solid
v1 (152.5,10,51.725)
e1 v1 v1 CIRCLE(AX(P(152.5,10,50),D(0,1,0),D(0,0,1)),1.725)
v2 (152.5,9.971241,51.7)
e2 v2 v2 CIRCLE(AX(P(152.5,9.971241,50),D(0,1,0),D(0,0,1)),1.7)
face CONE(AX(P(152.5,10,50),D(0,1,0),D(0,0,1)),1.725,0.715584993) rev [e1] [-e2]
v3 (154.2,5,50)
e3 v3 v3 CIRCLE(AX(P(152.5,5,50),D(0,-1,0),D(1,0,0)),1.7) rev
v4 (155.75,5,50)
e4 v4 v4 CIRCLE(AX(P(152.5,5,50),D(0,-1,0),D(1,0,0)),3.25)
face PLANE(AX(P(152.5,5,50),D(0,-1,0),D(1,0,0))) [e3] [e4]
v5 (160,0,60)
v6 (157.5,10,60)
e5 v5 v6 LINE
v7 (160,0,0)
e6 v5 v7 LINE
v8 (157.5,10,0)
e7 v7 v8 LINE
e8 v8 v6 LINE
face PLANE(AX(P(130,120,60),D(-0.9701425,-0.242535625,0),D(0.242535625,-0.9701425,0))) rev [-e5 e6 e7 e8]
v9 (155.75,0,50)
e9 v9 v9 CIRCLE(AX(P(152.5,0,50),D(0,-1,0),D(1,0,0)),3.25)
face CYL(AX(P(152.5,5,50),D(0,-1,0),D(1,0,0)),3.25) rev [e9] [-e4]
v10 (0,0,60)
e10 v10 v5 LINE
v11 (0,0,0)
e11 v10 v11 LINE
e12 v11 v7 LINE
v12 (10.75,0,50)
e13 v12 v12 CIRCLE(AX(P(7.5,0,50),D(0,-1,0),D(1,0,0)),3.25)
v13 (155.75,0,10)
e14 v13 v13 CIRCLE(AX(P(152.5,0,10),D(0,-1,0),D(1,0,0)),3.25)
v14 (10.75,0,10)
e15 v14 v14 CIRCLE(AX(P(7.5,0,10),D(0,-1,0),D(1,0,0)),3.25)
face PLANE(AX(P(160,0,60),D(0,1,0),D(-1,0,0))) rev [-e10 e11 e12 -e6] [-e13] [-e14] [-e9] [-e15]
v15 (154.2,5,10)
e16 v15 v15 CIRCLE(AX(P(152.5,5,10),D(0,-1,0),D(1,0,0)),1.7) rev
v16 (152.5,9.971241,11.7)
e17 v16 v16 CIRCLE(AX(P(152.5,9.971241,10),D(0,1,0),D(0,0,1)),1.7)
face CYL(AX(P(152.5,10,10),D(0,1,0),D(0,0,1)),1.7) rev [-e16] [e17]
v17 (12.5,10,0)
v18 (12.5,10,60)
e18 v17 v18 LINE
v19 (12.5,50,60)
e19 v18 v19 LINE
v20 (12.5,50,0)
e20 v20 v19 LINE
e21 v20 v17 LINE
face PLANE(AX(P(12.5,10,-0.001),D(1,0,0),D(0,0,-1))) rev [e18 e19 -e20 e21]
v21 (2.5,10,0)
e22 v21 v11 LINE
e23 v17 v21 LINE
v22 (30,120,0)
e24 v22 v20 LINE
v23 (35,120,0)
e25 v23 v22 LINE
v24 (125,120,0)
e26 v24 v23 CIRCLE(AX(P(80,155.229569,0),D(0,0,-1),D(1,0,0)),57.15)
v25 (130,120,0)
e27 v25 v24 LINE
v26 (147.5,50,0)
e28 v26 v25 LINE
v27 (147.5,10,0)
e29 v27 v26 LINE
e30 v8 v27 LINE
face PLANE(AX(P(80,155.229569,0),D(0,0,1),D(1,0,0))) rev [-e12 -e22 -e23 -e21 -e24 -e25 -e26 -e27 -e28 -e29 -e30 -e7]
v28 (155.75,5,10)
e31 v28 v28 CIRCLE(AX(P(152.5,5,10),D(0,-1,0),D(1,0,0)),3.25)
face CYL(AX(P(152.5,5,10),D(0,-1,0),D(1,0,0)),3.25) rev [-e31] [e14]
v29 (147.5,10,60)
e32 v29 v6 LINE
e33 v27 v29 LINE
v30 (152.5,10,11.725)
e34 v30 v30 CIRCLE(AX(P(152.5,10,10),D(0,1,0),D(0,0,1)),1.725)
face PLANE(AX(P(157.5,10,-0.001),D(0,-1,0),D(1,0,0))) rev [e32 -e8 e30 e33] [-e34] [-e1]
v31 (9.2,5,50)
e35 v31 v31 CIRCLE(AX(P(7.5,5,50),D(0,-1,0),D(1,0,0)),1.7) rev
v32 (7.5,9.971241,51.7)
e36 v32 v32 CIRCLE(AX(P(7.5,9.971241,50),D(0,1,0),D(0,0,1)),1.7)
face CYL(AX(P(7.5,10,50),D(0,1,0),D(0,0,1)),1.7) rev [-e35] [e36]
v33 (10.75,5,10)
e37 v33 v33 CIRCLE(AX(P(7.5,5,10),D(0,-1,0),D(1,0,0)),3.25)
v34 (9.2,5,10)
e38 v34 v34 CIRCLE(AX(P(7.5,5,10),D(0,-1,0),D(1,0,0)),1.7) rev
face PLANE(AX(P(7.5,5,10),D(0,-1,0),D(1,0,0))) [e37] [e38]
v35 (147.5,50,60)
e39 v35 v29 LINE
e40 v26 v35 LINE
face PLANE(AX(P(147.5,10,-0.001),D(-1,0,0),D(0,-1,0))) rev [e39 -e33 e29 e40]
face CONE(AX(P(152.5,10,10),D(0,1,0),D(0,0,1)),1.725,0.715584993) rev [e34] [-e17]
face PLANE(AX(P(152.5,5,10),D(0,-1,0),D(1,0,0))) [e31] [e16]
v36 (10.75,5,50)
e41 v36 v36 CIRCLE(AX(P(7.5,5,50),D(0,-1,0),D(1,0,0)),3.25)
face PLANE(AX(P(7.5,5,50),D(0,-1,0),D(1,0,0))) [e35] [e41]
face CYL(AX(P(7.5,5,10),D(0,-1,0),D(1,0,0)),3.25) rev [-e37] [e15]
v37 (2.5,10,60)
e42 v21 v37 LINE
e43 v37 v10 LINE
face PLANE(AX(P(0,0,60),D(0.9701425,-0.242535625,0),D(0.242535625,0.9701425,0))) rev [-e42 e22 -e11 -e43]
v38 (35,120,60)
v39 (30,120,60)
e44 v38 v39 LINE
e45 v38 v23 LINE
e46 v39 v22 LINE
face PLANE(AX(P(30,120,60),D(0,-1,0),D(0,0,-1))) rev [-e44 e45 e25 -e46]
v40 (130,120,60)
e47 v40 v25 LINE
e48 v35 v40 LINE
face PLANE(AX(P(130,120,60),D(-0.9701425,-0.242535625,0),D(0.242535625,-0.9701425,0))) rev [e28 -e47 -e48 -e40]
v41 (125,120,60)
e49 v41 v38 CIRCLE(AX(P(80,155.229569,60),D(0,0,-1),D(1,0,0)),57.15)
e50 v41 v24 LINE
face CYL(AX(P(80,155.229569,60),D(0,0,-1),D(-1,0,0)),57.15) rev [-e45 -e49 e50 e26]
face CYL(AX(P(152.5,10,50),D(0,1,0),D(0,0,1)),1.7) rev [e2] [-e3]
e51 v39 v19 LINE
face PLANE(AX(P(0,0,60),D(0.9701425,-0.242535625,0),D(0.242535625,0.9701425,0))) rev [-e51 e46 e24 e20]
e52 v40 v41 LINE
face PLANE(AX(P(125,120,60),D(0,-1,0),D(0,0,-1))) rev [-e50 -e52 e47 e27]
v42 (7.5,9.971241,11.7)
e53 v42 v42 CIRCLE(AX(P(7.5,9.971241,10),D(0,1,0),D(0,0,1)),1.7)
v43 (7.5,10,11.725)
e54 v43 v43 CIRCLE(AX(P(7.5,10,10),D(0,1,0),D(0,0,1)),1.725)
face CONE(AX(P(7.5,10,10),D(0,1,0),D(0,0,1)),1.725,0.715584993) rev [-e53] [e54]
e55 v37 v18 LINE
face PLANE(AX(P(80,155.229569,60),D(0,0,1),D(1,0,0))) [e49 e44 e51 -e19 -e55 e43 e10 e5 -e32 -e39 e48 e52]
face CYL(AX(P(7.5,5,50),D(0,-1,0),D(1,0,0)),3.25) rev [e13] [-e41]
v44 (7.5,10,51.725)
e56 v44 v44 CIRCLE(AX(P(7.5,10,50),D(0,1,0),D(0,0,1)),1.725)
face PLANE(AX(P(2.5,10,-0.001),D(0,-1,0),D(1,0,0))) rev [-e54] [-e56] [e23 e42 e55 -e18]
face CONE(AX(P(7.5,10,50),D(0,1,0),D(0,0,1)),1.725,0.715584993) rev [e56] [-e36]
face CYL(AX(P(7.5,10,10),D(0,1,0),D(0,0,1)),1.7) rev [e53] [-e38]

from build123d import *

# Parameters (mm, degrees)
EXTRUDE_1_DEPTH     = 60
CUT_EXTRUDE_1_REACH = 210.806
SKETCH_7_R          = 3.25
CUT_EXTRUDE_2_DEPTH = 5


# Read off the part's stored shape, not the designer's step: M3 すきま穴1
with BuildPart() as part:
    # ｽｹｯﾁ1 → ﾎﾞｽ - 押し出し1 (new body)
    with BuildSketch(Plane.XY):
        with BuildLine():
            Line((0, 0), (30, 120))
            Line((30, 120), (35, 120))
            ThreePointArc((35, 120), (80, 98.079568547), (125, 120))
            Line((125, 120), (130, 120))
            Line((130, 120), (160, 0))
            Line((160, 0), (0, 0))
        make_face()
    extrude(amount=EXTRUDE_1_DEPTH)

    # ｽｹｯﾁ2 → ｶｯﾄ - 押し出し1 (cut, up to next)
    with BuildSketch(Plane.XY.offset(60), mode=Mode.PRIVATE) as cut_extrude_1_sk1:
        Polygon((2.5, 10), (12.5, 10), (12.5, 50), align=None)
    cut_extrude_1_tool1 = extrude(cut_extrude_1_sk1.sketch, amount=-CUT_EXTRUDE_1_REACH, mode=Mode.PRIVATE) & part.part
    # ｽｹｯﾁ2 → ｶｯﾄ - 押し出し1 (cut, up to next)
    with BuildSketch(Plane.XY.offset(60), mode=Mode.PRIVATE) as cut_extrude_1_sk2:
        Polygon((157.5, 10), (147.5, 10), (147.5, 50), align=None)
    cut_extrude_1_tool2 = extrude(cut_extrude_1_sk2.sketch, amount=-CUT_EXTRUDE_1_REACH, mode=Mode.PRIVATE) & part.part
    add(cut_extrude_1_tool1.solids().sort_by_distance((9.166667, 23.333333, 60))[0], mode=Mode.SUBTRACT)
    add(cut_extrude_1_tool2.solids().sort_by_distance((150.833333, 23.333333, 60))[0], mode=Mode.SUBTRACT)

    # M3 すきま穴1 outline → M3 すきま穴1 (revolve, cut)
    with BuildSketch(Plane(origin=(152.5, 0, 50), x_dir=(1, 0, 0), z_dir=(0, 0, 1))):
        Polygon((0, 0), (1.7, 0), (1.7, 9.97124079), (1.725, 10), (0, 10), align=None)
    revolve(axis=Axis((152.5, 0, 50), (0, 1, 0)), mode=Mode.SUBTRACT)

    # Hole Wizard M3 _1 2 outline → Hole Wizard M3 _1 2 (revolve, cut)
    with BuildSketch(Plane(origin=(152.5, 0, 10), x_dir=(1, 0, 0), z_dir=(0, 0, 1))):
        Polygon((0, 0), (1.7, 0), (1.7, 9.97124079), (1.725, 10), (0, 10), align=None)
    revolve(axis=Axis((152.5, 0, 10), (0, 1, 0)), mode=Mode.SUBTRACT)

    # Hole Wizard M3 _1 3 outline → Hole Wizard M3 _1 3 (revolve, cut)
    with BuildSketch(Plane(origin=(7.5, 0, 50), x_dir=(1, 0, 0), z_dir=(0, 0, 1))):
        Polygon((0, 0), (1.7, 0), (1.7, 9.97124079), (1.725, 10), (0, 10), align=None)
    revolve(axis=Axis((7.5, 0, 50), (0, 1, 0)), mode=Mode.SUBTRACT)

    # Hole Wizard M3 _1 4 outline → Hole Wizard M3 _1 4 (revolve, cut)
    with BuildSketch(Plane(origin=(7.5, 0, 10), x_dir=(1, 0, 0), z_dir=(0, 0, 1))):
        Polygon((0, 0), (1.7, 0), (1.7, 9.97124079), (1.725, 10), (0, 10), align=None)
    revolve(axis=Axis((7.5, 0, 10), (0, 1, 0)), mode=Mode.SUBTRACT)

    # ｽｹｯﾁ7 → ｶｯﾄ - 押し出し2 (cut)
    with BuildSketch(Plane.XZ):
        with Locations((7.5, 50)):
            Circle(SKETCH_7_R)
        with Locations((7.5, 10)):
            Circle(SKETCH_7_R)
        with Locations((152.5, 10)):
            Circle(SKETCH_7_R)
        with Locations((152.5, 50)):
            Circle(SKETCH_7_R)
    extrude(amount=-CUT_EXTRUDE_2_DEPTH, mode=Mode.SUBTRACT)


solid = part.part
